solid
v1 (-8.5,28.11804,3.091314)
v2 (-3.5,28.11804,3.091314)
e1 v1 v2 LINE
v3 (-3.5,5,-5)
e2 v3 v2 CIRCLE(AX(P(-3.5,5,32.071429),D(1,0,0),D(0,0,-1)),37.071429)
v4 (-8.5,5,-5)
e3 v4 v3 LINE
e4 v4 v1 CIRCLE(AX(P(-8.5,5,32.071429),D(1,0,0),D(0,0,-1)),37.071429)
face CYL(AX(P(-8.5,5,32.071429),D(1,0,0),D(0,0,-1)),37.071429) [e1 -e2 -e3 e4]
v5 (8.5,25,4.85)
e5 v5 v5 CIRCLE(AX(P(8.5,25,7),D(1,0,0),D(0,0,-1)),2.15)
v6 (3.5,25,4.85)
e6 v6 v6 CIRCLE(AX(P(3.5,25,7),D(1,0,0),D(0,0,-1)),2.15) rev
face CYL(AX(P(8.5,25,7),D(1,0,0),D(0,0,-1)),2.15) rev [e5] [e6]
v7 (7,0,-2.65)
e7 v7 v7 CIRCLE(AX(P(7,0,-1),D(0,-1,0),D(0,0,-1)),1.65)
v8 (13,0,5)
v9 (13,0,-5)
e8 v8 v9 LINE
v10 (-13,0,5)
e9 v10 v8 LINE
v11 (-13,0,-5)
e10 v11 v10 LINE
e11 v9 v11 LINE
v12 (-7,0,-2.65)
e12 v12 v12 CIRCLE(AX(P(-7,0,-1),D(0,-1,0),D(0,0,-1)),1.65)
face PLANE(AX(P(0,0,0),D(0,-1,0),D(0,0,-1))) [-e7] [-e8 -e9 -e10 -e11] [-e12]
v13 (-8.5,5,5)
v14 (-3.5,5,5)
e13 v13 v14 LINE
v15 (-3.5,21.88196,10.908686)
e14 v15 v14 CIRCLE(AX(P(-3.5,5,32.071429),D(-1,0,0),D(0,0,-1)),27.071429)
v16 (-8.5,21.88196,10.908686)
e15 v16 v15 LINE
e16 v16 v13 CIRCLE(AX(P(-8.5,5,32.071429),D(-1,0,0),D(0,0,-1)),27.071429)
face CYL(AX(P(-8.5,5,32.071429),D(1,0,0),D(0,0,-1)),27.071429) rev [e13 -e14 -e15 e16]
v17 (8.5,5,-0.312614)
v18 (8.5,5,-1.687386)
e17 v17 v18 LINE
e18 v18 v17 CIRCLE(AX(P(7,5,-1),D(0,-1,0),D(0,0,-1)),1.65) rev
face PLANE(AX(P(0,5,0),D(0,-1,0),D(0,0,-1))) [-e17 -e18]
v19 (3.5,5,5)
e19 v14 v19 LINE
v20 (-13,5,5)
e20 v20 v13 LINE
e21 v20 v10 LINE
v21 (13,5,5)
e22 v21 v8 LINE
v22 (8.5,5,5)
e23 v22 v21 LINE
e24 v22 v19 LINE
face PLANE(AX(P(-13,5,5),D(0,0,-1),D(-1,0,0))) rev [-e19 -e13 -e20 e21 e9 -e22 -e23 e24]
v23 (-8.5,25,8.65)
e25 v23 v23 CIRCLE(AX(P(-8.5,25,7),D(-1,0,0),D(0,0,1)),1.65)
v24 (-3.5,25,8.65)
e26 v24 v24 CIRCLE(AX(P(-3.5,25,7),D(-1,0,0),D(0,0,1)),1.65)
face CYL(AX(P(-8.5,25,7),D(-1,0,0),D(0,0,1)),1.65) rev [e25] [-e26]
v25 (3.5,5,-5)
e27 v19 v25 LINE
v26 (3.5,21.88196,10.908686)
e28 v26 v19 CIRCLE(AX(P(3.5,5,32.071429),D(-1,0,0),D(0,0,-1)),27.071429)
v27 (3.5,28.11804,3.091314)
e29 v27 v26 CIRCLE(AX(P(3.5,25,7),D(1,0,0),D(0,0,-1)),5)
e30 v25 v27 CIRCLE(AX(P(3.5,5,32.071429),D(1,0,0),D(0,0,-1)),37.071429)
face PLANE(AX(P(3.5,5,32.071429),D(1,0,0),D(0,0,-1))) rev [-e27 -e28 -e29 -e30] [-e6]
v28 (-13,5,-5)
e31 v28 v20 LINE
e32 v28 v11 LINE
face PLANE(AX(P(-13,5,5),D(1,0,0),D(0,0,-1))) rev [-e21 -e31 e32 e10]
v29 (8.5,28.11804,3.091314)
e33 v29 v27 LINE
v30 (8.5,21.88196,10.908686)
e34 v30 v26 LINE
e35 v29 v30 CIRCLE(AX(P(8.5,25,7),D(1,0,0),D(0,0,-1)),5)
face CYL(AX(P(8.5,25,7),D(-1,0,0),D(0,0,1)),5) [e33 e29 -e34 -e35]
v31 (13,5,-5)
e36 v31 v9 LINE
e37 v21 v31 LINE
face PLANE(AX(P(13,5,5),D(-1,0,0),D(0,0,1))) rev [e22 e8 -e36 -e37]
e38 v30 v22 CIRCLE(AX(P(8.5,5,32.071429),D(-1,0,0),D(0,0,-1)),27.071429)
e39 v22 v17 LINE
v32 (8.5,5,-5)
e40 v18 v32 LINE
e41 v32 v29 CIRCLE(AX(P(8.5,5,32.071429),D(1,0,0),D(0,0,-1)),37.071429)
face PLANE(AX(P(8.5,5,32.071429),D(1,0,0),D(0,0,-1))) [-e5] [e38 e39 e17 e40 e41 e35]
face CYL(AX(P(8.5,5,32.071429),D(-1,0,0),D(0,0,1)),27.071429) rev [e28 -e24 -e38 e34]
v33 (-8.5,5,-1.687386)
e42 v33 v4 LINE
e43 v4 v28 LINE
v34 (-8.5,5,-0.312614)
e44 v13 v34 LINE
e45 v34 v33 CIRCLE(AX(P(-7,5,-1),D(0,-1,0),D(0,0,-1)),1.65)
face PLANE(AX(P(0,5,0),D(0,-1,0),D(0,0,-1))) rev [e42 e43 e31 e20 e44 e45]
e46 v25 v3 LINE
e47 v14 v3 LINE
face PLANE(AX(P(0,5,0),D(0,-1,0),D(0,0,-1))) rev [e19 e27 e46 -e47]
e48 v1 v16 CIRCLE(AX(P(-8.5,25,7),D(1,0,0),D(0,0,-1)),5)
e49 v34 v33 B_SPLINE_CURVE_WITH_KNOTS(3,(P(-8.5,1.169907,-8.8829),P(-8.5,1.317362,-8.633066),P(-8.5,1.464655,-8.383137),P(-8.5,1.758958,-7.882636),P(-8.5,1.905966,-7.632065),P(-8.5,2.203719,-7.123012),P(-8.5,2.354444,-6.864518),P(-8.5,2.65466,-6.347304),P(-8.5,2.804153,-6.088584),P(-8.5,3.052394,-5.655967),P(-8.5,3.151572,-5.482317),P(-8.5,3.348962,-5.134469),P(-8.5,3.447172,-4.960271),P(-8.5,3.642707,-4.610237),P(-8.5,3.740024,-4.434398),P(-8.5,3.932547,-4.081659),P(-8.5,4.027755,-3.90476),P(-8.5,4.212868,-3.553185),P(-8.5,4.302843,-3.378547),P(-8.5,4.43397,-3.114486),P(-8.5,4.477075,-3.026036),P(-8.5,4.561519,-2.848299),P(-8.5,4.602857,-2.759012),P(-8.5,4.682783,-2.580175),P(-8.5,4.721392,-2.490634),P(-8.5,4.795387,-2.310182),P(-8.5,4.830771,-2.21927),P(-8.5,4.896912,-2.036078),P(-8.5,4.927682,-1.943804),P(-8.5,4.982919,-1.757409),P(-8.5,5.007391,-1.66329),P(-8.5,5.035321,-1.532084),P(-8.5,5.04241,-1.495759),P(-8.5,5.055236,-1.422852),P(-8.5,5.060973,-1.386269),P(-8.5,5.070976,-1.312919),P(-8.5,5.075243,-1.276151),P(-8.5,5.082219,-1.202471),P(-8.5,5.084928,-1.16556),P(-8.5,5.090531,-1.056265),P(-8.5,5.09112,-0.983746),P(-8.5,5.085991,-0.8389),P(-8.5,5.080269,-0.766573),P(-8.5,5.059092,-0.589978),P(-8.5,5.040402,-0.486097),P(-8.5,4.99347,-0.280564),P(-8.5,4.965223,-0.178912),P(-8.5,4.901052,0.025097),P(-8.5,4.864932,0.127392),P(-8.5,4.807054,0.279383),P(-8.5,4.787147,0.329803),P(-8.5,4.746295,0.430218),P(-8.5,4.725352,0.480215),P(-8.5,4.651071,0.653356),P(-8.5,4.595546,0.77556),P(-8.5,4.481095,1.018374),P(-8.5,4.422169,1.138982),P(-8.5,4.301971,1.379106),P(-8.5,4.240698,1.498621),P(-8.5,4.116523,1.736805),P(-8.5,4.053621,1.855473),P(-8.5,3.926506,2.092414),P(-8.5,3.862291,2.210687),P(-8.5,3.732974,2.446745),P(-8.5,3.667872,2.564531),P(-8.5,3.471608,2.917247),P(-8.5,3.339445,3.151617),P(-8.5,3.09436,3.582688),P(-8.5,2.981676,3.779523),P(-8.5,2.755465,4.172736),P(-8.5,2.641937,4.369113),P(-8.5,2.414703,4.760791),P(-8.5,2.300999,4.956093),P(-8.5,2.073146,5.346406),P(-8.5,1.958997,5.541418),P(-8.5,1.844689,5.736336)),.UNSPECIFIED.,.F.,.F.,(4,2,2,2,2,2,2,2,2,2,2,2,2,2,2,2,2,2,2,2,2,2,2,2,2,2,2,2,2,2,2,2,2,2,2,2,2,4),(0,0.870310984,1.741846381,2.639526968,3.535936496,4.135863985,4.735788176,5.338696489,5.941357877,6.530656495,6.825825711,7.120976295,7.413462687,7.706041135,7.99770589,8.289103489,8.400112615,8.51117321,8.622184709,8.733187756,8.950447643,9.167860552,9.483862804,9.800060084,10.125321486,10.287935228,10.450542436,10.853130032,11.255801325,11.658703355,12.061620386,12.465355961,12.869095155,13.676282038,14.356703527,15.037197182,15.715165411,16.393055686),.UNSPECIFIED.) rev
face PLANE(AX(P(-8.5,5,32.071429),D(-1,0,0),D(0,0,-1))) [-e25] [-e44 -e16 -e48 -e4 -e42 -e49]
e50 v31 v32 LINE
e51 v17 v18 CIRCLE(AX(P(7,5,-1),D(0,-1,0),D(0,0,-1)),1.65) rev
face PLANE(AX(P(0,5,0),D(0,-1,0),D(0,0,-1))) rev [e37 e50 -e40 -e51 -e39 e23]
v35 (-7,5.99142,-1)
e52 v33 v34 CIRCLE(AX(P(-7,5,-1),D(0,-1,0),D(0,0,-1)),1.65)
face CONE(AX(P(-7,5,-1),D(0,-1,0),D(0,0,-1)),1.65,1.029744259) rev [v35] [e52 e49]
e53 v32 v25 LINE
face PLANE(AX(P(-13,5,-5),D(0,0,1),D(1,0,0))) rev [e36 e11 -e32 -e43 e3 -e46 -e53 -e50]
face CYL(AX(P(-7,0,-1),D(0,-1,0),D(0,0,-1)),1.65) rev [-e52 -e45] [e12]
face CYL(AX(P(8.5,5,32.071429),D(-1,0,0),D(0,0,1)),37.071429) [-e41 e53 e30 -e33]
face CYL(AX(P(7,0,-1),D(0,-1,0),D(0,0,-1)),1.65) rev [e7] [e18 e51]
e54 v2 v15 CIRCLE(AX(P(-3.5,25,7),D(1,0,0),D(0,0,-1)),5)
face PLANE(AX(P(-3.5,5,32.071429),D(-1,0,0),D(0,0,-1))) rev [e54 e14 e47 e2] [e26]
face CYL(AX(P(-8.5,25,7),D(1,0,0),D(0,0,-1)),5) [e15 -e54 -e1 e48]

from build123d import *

# Parameters (mm, degrees)
SKETCH_1_W                   = 26
SKETCH_1_H                   = 10
EXTRUDE_1_DEPTH              = 5
EXTRUDE_START                = 3.5
EXTRUDE_2_DEPTH              = 5
HOLE_WIZARD_M4_1_REACH       = 37.089
HOLE_WIZARD_M4_1_BORE_R      = 2.15
HOLE_WIZARD_M4_1_2_OUTLINE_R = 1.65
HOLE_WIZARD_M4_1_2_DEPTH     = 5
HOLE_WIZARD_M4_2_D           = 3.3


# Read off the part's stored shape, not the designer's step: M4 螺纹孔1
with BuildPart() as part:
    # 草图1 → 凸台-拉伸1 (new body)
    with BuildSketch(Plane(origin=(0, 0, 0), x_dir=(1, 0, 0), z_dir=(0, 1, 0))):
        Rectangle(SKETCH_1_W, SKETCH_1_H)
    extrude(amount=EXTRUDE_1_DEPTH)

    # 草图2 → 凸台-拉伸2 (add)
    with BuildSketch(Plane(origin=(0, 0, 0), x_dir=(0, 0, -1), z_dir=(1, 0, 0)).offset(EXTRUDE_START)):
        with BuildLine():
            Line((-5, 5), (5, 5))
            ThreePointArc((5, 5), (2.918749068, 17.246562174), (-3.091314031, 28.118040089))
            ThreePointArc((-3.091314031, 28.118040089), (-10.118040089, 28.908685969), (-10.908685969, 21.881959911))
            ThreePointArc((-10.908685969, 21.881959911), (-6.519834496, 13.943057927), (-5, 5))
        make_face()
    extrude_2 = extrude(amount=EXTRUDE_2_DEPTH)

    # 镜向1: 凸台-拉伸2 across plane
    add(extrude_2.mirror(Plane(origin=(0, 0, 0), x_dir=(0, 0, 1), z_dir=(1, 0, 0))))

    # Hole Wizard M4 _1 bore (on position points) → Hole Wizard M4 _1 (cut, up to next)
    with BuildSketch(Plane(origin=(8.5, 25, 7), x_dir=(0, 0, 1), z_dir=(1, 0, 0)), mode=Mode.PRIVATE) as hole_wizard_m4_1_sk1:
        Circle(HOLE_WIZARD_M4_1_BORE_R)
    hole_wizard_m4_1_tool1 = extrude(hole_wizard_m4_1_sk1.sketch, amount=-HOLE_WIZARD_M4_1_REACH, mode=Mode.PRIVATE) & part.part
    add(hole_wizard_m4_1_tool1.solids().sort_by_distance((8.5, 25, 7))[0], mode=Mode.SUBTRACT)

    # Hole Wizard M4 _1 2 outline → Hole Wizard M4 _1 2 (cut)
    with BuildSketch(Plane(origin=(0, 0, 0), x_dir=(1, 0, 0), z_dir=(0, 1, 0))):
        with Locations((7, 1)):
            Circle(HOLE_WIZARD_M4_1_2_OUTLINE_R)
    extrude(amount=HOLE_WIZARD_M4_1_2_DEPTH, mode=Mode.SUBTRACT)

    # Hole Wizard M4 _1 2 2 outline → Hole Wizard M4 _1 2 2 (revolve, cut)
    with BuildSketch(Plane(origin=(-7, 0, -1), x_dir=(1, 0, 0), z_dir=(0, 0, 1))):
        Polygon((1.650000121, 4.999999927), (0, 5.991420021), (0, 0), (1.650000121, 0), align=None)
    revolve(axis=Axis((-7, 0, -1), (0, 1, 0)), mode=Mode.SUBTRACT)

    # M4 螺纹孔2 (through all)
    with Locations(Plane.ZY.offset(8.5)):
        with Locations((7, 25)):
            Hole(HOLE_WIZARD_M4_2_D / 2)


solid = part.part
